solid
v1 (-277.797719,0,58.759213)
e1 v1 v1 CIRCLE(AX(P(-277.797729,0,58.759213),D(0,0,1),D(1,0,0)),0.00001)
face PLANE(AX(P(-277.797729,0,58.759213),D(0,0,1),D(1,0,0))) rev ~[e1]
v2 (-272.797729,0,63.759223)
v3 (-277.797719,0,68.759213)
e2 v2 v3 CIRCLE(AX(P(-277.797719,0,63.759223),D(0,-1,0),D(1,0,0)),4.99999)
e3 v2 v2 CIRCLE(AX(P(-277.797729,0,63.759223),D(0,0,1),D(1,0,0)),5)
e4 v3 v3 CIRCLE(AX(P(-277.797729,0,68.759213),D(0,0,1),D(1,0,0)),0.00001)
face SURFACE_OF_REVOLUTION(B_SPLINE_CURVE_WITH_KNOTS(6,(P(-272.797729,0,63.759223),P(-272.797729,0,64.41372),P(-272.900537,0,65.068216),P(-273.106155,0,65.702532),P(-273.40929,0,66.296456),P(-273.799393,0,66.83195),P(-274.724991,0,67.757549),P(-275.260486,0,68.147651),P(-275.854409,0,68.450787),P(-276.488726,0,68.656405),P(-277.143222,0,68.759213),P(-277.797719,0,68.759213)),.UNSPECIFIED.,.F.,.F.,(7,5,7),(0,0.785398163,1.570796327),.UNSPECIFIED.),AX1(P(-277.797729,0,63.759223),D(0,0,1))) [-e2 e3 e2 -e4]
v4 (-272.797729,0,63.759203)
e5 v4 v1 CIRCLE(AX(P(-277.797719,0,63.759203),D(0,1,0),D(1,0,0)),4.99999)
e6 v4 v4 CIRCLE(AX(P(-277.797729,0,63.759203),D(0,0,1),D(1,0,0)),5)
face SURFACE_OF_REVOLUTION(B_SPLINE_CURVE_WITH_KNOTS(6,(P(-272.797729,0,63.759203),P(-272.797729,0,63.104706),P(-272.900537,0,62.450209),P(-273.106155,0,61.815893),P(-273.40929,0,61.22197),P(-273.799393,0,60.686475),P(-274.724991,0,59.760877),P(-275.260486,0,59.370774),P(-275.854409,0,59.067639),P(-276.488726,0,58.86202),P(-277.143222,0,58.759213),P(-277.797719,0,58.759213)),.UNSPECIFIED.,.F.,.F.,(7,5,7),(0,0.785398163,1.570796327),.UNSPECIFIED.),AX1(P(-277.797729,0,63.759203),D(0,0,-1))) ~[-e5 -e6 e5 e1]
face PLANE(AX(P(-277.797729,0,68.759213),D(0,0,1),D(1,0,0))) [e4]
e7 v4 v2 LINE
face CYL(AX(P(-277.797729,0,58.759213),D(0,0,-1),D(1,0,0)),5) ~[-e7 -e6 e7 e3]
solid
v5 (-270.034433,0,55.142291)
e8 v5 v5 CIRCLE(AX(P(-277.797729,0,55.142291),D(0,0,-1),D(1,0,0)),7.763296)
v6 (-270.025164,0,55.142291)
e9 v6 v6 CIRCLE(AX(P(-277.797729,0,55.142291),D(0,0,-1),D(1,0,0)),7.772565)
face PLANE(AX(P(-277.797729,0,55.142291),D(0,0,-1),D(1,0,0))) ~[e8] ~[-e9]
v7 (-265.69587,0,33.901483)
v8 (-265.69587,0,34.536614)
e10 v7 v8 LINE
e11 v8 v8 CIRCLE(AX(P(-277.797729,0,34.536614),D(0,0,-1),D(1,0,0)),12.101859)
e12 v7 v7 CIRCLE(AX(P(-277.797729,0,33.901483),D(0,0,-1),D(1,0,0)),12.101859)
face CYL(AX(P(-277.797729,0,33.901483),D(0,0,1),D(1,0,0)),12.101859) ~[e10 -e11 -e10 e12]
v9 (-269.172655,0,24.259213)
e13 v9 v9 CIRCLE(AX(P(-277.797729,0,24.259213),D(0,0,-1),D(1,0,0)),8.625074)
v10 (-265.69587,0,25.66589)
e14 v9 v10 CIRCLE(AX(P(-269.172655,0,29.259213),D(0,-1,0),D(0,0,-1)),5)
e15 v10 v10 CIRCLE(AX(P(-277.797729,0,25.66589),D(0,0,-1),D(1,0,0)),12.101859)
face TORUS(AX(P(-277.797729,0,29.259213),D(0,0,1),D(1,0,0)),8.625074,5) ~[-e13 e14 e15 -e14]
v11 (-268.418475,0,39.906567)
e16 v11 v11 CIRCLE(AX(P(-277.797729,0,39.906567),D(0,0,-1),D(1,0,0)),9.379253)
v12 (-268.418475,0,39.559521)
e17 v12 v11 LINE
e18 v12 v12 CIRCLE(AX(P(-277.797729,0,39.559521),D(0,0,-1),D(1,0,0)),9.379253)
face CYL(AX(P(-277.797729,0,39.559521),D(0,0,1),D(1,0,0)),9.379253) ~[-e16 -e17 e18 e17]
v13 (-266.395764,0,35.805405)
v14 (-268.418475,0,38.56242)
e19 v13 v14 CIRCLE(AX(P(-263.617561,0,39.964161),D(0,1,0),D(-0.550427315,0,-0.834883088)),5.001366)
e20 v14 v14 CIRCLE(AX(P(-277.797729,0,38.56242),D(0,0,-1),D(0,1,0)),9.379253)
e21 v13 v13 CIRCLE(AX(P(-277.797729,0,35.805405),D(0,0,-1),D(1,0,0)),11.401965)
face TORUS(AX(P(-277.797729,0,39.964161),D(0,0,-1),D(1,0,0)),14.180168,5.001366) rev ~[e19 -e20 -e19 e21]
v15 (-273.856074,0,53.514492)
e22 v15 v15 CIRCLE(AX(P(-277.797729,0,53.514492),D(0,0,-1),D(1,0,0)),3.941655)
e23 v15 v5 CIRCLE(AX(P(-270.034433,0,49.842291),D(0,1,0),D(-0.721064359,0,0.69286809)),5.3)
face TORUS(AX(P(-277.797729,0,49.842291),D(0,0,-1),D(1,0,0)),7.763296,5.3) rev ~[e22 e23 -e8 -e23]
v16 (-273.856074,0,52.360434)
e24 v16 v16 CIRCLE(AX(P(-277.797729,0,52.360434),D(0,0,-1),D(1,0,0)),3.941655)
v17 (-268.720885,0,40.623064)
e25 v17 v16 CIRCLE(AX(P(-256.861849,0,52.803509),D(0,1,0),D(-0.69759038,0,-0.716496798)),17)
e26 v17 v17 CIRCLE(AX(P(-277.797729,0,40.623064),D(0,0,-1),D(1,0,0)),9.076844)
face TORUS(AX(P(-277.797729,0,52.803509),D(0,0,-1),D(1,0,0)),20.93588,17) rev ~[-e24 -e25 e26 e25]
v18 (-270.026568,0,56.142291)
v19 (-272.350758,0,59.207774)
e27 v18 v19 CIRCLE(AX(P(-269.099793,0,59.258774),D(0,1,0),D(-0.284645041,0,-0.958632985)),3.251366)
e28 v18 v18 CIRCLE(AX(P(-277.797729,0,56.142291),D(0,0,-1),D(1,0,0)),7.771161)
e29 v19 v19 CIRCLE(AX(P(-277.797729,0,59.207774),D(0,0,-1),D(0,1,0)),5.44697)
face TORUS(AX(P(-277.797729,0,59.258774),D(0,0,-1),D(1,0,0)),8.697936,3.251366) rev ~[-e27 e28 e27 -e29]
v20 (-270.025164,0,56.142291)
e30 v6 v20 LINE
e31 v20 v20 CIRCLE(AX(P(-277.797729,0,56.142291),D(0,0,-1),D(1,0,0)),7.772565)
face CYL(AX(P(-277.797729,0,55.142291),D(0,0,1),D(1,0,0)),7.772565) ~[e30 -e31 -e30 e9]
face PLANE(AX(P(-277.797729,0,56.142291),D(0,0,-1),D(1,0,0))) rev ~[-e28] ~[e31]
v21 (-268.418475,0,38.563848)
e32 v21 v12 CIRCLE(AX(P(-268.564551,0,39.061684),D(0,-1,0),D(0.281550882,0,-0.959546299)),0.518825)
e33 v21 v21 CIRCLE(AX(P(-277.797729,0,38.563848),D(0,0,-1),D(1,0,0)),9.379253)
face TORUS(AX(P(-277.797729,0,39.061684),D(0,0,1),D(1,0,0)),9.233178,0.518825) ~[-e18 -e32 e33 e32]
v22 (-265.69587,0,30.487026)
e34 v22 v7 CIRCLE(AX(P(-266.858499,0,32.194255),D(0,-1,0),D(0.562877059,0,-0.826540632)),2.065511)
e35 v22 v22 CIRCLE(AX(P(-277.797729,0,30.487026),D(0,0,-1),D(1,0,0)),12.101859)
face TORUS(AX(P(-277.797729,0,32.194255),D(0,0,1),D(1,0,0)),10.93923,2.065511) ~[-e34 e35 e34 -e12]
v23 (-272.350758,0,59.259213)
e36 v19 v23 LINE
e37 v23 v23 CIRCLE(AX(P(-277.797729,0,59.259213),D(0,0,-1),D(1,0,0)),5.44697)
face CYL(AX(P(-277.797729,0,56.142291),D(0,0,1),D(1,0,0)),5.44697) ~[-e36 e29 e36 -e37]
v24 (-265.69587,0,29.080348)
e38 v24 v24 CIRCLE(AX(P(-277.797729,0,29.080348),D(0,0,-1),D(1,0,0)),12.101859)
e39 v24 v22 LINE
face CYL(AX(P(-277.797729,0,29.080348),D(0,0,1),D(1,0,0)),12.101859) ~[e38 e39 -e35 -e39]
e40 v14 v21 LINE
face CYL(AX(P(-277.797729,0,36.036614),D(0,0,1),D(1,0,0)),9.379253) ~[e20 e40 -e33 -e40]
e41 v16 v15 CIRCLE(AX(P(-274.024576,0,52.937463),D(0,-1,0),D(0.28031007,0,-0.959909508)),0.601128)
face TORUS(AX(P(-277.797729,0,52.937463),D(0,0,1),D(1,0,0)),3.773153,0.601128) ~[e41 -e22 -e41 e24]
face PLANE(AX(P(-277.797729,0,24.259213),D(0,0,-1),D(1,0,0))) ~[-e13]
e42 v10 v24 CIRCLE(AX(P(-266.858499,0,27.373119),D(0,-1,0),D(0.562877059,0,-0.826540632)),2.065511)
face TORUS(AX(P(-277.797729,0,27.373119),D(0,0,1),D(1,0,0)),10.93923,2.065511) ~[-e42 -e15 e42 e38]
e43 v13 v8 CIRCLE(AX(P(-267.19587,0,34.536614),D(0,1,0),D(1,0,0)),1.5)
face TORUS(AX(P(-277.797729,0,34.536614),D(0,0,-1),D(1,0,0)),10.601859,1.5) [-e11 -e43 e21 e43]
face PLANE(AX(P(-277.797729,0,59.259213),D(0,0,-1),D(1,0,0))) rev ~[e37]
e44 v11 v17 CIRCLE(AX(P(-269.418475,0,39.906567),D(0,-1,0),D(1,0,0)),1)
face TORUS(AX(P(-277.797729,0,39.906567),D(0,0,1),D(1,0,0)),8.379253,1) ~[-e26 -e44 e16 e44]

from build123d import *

# Parameters (mm, degrees)
F3_R        = 1.5
F5_R        = 1
F6_S5_R     = 9.379253336
F6_T6_DEPTH = 47009
F10_R       = 5
F11_DEPTH   = 10
F12_R       = 4.99999


# Not quite as in the source:
# - a fillet or chamfer that OpenCascade refuses, or shapes differently, is made with other operations: its cross-section is extruded or revolved along the edge and cut away or added
# - a fillet or chamfer is up to 0.001 mm smaller than in the source, because OpenCascade refuses the exact size


with BuildPart() as f1:
    # F0 (on Front) → F1 (revolve)
    with BuildSketch(Plane.XZ):
        with BuildLine():
            Line((-272.3507583141, 59.2592127276), (-277.7977287769, 59.2592127276))
            Line((-277.7977287769, 59.2592127276), (-277.7977287769, 24.2592127276))
            Line((-277.7977287769, 24.2592127276), (-265.6958699226, 24.2592127276))
            Line((-265.6958699226, 24.2592127276), (-265.6958699226, 25.6658904254))
            ThreePointArc((-265.6958699226, 25.6658904254), (-264.7929876455, 27.3731192574), (-265.6958699226, 29.0803480893))
            Line((-265.6958699226, 29.0803480893), (-265.6958699226, 30.4870257872))
            ThreePointArc((-265.6958699226, 30.4870257872), (-264.7929876455, 32.1942546192), (-265.6958699226, 33.9014834511))
            Line((-265.6958699226, 33.9014834511), (-265.6958699226, 36.0366143286))
            Line((-265.6958699226, 36.0366143286), (-268.4184754409, 36.0366143286))
            Line((-268.4184754409, 36.0366143286), (-268.4184754409, 38.5638475418))
            ThreePointArc((-268.4184754409, 38.5638475418), (-268.0457260693, 39.0616841614), (-268.4184754409, 39.559520781))
            Line((-268.4184754409, 39.559520781), (-268.4184754409, 40.9065671265))
            Line((-268.4184754409, 40.9065671265), (-273.8560736179, 40.9065671265))
            Line((-273.8560736179, 40.9065671265), (-273.8560736179, 52.3604340851))
            ThreePointArc((-273.8560736179, 52.3604340851), (-273.4234475816, 52.9374629259), (-273.8560736179, 53.5144917667))
            Line((-273.8560736179, 53.5144917667), (-273.8560736179, 55.1422908902))
            Line((-273.8560736179, 55.1422908902), (-270.0251638889, 55.1422908902))
            Line((-270.0251638889, 55.1422908902), (-270.0251638889, 56.1422908902))
            Line((-270.0251638889, 56.1422908902), (-272.3507583141, 56.1422908902))
            Line((-272.3507583141, 56.1422908902), (-272.3507583141, 59.2592127276))
        make_face()
    revolve(axis=Axis((-277.7977287769, 0, 41.7592127276), (0, 0, -1)))

    # F2: fillet of radius 5 on 1 edges, made by hand

    # F2_s1 → F2_t2 (revolve, cut)
    with BuildSketch(Plane.XZ):
        with BuildLine():
            ThreePointArc((-269.1726550516, 24.2592127276), (-267.2973699414, 24.6242040161), (-265.6958699226, 25.6658904254))
            Line((-265.6958699226, 25.6658904254), (-265.6958699226, 24.2592127276))
            Line((-265.6958699226, 24.2592127276), (-269.1726550516, 24.2592127276))
        make_face()
    revolve(axis=Axis((-277.7977287769, 0, 24.2592127276), (0, 0, -1)), mode=Mode.SUBTRACT)

    # F3
    f3_edges = [f1.edges().sort_by_distance(p)[0] for p in [
        (-289.899588, 0, 36.036614),
    ]]
    fillet(f3_edges, radius=F3_R)

    # F4: fillet of radius 5 on 1 edges, made by hand

    # F4_s1 → F4_t2 (revolve)
    with BuildSketch(Plane.XZ):
        with BuildLine():
            ThreePointArc((-266.3704491218, 35.7886050081), (-267.6414609661, 36.9939945683), (-268.4188594399, 38.5637355384))
            Line((-268.4188594399, 38.5637355384), (-268.8989893, 38.4236930284))
            ThreePointArc((-268.8989893, 38.4236930284), (-268.9186120094, 37.3001749335), (-268.9186120094, 36.0366143286))
            Line((-268.9186120094, 36.0366143286), (-268.4184754409, 35.5364777601))
            ThreePointArc((-268.4184754409, 35.5364777601), (-267.1958699226, 35.5364777601), (-266.6457379501, 35.3710494451))
            Line((-266.6457379501, 35.3710494451), (-266.3704491218, 35.7886050081))
        make_face()
    revolve(axis=Axis((-277.7977287769, 0, 36.0366143286), (0, 0, -1)))

    # F5
    f5_edges = [f1.edges().sort_by_distance(p)[0] for p in [
        (-287.176982, 0, 40.906567),
    ]]
    fillet(f5_edges, radius=F5_R)

    # F6: fillet of radius 17 on 1 edges, made by hand


with BuildPart() as f6_tool2:
    # F6_s3 → F6_t4 (revolve)
    with BuildSketch(Plane.XZ):
        with BuildLine():
            ThreePointArc((-268.7208850605, 40.6230639242), (-272.4364798651, 45.9894900588), (-273.8560736179, 52.3604340851))
            Line((-273.8560736179, 52.3604340851), (-275.5554961204, 52.3161265451))
            ThreePointArc((-275.5554961204, 52.3161265451), (-275.5560736179, 46.6335006058), (-275.5560736179, 40.9065671265))
            Line((-275.5560736179, 40.9065671265), (-273.8560736179, 39.2065671265))
            ThreePointArc((-273.8560736179, 39.2065671265), (-269.4184754409, 39.2065671265), (-269.9067887072, 39.4050193681))
            Line((-269.9067887072, 39.4050193681), (-268.7208850605, 40.6230639242))
        make_face()
    revolve(axis=Axis((-277.7977287769, 0, 40.9065671265), (0, 0, -1)))

    # F6_s5 → F6_t6 (intersect, symmetric)
    with BuildSketch(Plane.XY.offset(43.8)):
        with Locations((-277.7977287769, 0)):
            Circle(F6_S5_R)
    extrude(amount=F6_T6_DEPTH, both=True, mode=Mode.INTERSECT)


with BuildPart() as f1_1:
    add(f1.part)

    # F6_t1: union F6_tool2
    add(f6_tool2.part)

    # F7: fillet of radius 5.3 on 1 edges, made by hand

    # F7_s1 → F7_t2 (revolve)
    with BuildSketch(Plane.XZ):
        with BuildLine():
            ThreePointArc((-273.8560736179, 53.5144917667), (-272.111369605, 54.7183889535), (-270.0344325146, 55.1422908902))
            Line((-270.0344325146, 55.1422908902), (-273.8560736179, 55.1422908902))
            Line((-273.8560736179, 55.1422908902), (-273.8560736179, 53.5144917667))
        make_face()
    revolve(axis=Axis((-277.7977287769, 0, 55.1422908902), (0, 0, -1)))

    # F8: fillet of radius 3.25 on 1 edges, made by hand

    # F8_s1 → F8_t2 (revolve)
    with BuildSketch(Plane.XZ):
        with BuildLine():
            ThreePointArc((-270.0252777469, 56.141907437), (-271.705600505, 57.3142574044), (-272.3511583141, 59.2587738307))
            Line((-272.3511583141, 59.2587738307), (-272.6762948827, 59.2587738307))
            ThreePointArc((-272.6762948827, 59.2587738307), (-272.6758948827, 57.7005323605), (-272.6758948827, 56.1422908902))
            Line((-272.6758948827, 56.1422908902), (-272.3507583141, 55.8171543217))
            ThreePointArc((-272.3507583141, 55.8171543217), (-271.1880180305, 55.8171543217), (-270.1178262588, 55.8302207977))
            Line((-270.1178262588, 55.8302207977), (-270.0252777469, 56.141907437))
        make_face()
    revolve(axis=Axis((-277.7977287769, 0, 56.1422908902), (0, 0, -1)))


with BuildPart() as f11:
    # F10 (on offset) → F11 (new body)
    with BuildSketch(Plane.XY.offset(58.7592127276)):
        with Locations((-277.7977287769, 0)):
            Circle(F10_R)
    extrude(amount=F11_DEPTH)

    # F12 (radius 5 in the source; OpenCascade refuses exactly that, so slightly less here)
    f12_edges = [f11.edges().sort_by_distance(p)[0] for p in [
        (-282.797729, 0, 68.759213),
        (-282.797729, 0, 58.759213),
    ]]
    fillet(f12_edges, radius=F12_R)


solid = Compound([f1_1.part, f11.part])
